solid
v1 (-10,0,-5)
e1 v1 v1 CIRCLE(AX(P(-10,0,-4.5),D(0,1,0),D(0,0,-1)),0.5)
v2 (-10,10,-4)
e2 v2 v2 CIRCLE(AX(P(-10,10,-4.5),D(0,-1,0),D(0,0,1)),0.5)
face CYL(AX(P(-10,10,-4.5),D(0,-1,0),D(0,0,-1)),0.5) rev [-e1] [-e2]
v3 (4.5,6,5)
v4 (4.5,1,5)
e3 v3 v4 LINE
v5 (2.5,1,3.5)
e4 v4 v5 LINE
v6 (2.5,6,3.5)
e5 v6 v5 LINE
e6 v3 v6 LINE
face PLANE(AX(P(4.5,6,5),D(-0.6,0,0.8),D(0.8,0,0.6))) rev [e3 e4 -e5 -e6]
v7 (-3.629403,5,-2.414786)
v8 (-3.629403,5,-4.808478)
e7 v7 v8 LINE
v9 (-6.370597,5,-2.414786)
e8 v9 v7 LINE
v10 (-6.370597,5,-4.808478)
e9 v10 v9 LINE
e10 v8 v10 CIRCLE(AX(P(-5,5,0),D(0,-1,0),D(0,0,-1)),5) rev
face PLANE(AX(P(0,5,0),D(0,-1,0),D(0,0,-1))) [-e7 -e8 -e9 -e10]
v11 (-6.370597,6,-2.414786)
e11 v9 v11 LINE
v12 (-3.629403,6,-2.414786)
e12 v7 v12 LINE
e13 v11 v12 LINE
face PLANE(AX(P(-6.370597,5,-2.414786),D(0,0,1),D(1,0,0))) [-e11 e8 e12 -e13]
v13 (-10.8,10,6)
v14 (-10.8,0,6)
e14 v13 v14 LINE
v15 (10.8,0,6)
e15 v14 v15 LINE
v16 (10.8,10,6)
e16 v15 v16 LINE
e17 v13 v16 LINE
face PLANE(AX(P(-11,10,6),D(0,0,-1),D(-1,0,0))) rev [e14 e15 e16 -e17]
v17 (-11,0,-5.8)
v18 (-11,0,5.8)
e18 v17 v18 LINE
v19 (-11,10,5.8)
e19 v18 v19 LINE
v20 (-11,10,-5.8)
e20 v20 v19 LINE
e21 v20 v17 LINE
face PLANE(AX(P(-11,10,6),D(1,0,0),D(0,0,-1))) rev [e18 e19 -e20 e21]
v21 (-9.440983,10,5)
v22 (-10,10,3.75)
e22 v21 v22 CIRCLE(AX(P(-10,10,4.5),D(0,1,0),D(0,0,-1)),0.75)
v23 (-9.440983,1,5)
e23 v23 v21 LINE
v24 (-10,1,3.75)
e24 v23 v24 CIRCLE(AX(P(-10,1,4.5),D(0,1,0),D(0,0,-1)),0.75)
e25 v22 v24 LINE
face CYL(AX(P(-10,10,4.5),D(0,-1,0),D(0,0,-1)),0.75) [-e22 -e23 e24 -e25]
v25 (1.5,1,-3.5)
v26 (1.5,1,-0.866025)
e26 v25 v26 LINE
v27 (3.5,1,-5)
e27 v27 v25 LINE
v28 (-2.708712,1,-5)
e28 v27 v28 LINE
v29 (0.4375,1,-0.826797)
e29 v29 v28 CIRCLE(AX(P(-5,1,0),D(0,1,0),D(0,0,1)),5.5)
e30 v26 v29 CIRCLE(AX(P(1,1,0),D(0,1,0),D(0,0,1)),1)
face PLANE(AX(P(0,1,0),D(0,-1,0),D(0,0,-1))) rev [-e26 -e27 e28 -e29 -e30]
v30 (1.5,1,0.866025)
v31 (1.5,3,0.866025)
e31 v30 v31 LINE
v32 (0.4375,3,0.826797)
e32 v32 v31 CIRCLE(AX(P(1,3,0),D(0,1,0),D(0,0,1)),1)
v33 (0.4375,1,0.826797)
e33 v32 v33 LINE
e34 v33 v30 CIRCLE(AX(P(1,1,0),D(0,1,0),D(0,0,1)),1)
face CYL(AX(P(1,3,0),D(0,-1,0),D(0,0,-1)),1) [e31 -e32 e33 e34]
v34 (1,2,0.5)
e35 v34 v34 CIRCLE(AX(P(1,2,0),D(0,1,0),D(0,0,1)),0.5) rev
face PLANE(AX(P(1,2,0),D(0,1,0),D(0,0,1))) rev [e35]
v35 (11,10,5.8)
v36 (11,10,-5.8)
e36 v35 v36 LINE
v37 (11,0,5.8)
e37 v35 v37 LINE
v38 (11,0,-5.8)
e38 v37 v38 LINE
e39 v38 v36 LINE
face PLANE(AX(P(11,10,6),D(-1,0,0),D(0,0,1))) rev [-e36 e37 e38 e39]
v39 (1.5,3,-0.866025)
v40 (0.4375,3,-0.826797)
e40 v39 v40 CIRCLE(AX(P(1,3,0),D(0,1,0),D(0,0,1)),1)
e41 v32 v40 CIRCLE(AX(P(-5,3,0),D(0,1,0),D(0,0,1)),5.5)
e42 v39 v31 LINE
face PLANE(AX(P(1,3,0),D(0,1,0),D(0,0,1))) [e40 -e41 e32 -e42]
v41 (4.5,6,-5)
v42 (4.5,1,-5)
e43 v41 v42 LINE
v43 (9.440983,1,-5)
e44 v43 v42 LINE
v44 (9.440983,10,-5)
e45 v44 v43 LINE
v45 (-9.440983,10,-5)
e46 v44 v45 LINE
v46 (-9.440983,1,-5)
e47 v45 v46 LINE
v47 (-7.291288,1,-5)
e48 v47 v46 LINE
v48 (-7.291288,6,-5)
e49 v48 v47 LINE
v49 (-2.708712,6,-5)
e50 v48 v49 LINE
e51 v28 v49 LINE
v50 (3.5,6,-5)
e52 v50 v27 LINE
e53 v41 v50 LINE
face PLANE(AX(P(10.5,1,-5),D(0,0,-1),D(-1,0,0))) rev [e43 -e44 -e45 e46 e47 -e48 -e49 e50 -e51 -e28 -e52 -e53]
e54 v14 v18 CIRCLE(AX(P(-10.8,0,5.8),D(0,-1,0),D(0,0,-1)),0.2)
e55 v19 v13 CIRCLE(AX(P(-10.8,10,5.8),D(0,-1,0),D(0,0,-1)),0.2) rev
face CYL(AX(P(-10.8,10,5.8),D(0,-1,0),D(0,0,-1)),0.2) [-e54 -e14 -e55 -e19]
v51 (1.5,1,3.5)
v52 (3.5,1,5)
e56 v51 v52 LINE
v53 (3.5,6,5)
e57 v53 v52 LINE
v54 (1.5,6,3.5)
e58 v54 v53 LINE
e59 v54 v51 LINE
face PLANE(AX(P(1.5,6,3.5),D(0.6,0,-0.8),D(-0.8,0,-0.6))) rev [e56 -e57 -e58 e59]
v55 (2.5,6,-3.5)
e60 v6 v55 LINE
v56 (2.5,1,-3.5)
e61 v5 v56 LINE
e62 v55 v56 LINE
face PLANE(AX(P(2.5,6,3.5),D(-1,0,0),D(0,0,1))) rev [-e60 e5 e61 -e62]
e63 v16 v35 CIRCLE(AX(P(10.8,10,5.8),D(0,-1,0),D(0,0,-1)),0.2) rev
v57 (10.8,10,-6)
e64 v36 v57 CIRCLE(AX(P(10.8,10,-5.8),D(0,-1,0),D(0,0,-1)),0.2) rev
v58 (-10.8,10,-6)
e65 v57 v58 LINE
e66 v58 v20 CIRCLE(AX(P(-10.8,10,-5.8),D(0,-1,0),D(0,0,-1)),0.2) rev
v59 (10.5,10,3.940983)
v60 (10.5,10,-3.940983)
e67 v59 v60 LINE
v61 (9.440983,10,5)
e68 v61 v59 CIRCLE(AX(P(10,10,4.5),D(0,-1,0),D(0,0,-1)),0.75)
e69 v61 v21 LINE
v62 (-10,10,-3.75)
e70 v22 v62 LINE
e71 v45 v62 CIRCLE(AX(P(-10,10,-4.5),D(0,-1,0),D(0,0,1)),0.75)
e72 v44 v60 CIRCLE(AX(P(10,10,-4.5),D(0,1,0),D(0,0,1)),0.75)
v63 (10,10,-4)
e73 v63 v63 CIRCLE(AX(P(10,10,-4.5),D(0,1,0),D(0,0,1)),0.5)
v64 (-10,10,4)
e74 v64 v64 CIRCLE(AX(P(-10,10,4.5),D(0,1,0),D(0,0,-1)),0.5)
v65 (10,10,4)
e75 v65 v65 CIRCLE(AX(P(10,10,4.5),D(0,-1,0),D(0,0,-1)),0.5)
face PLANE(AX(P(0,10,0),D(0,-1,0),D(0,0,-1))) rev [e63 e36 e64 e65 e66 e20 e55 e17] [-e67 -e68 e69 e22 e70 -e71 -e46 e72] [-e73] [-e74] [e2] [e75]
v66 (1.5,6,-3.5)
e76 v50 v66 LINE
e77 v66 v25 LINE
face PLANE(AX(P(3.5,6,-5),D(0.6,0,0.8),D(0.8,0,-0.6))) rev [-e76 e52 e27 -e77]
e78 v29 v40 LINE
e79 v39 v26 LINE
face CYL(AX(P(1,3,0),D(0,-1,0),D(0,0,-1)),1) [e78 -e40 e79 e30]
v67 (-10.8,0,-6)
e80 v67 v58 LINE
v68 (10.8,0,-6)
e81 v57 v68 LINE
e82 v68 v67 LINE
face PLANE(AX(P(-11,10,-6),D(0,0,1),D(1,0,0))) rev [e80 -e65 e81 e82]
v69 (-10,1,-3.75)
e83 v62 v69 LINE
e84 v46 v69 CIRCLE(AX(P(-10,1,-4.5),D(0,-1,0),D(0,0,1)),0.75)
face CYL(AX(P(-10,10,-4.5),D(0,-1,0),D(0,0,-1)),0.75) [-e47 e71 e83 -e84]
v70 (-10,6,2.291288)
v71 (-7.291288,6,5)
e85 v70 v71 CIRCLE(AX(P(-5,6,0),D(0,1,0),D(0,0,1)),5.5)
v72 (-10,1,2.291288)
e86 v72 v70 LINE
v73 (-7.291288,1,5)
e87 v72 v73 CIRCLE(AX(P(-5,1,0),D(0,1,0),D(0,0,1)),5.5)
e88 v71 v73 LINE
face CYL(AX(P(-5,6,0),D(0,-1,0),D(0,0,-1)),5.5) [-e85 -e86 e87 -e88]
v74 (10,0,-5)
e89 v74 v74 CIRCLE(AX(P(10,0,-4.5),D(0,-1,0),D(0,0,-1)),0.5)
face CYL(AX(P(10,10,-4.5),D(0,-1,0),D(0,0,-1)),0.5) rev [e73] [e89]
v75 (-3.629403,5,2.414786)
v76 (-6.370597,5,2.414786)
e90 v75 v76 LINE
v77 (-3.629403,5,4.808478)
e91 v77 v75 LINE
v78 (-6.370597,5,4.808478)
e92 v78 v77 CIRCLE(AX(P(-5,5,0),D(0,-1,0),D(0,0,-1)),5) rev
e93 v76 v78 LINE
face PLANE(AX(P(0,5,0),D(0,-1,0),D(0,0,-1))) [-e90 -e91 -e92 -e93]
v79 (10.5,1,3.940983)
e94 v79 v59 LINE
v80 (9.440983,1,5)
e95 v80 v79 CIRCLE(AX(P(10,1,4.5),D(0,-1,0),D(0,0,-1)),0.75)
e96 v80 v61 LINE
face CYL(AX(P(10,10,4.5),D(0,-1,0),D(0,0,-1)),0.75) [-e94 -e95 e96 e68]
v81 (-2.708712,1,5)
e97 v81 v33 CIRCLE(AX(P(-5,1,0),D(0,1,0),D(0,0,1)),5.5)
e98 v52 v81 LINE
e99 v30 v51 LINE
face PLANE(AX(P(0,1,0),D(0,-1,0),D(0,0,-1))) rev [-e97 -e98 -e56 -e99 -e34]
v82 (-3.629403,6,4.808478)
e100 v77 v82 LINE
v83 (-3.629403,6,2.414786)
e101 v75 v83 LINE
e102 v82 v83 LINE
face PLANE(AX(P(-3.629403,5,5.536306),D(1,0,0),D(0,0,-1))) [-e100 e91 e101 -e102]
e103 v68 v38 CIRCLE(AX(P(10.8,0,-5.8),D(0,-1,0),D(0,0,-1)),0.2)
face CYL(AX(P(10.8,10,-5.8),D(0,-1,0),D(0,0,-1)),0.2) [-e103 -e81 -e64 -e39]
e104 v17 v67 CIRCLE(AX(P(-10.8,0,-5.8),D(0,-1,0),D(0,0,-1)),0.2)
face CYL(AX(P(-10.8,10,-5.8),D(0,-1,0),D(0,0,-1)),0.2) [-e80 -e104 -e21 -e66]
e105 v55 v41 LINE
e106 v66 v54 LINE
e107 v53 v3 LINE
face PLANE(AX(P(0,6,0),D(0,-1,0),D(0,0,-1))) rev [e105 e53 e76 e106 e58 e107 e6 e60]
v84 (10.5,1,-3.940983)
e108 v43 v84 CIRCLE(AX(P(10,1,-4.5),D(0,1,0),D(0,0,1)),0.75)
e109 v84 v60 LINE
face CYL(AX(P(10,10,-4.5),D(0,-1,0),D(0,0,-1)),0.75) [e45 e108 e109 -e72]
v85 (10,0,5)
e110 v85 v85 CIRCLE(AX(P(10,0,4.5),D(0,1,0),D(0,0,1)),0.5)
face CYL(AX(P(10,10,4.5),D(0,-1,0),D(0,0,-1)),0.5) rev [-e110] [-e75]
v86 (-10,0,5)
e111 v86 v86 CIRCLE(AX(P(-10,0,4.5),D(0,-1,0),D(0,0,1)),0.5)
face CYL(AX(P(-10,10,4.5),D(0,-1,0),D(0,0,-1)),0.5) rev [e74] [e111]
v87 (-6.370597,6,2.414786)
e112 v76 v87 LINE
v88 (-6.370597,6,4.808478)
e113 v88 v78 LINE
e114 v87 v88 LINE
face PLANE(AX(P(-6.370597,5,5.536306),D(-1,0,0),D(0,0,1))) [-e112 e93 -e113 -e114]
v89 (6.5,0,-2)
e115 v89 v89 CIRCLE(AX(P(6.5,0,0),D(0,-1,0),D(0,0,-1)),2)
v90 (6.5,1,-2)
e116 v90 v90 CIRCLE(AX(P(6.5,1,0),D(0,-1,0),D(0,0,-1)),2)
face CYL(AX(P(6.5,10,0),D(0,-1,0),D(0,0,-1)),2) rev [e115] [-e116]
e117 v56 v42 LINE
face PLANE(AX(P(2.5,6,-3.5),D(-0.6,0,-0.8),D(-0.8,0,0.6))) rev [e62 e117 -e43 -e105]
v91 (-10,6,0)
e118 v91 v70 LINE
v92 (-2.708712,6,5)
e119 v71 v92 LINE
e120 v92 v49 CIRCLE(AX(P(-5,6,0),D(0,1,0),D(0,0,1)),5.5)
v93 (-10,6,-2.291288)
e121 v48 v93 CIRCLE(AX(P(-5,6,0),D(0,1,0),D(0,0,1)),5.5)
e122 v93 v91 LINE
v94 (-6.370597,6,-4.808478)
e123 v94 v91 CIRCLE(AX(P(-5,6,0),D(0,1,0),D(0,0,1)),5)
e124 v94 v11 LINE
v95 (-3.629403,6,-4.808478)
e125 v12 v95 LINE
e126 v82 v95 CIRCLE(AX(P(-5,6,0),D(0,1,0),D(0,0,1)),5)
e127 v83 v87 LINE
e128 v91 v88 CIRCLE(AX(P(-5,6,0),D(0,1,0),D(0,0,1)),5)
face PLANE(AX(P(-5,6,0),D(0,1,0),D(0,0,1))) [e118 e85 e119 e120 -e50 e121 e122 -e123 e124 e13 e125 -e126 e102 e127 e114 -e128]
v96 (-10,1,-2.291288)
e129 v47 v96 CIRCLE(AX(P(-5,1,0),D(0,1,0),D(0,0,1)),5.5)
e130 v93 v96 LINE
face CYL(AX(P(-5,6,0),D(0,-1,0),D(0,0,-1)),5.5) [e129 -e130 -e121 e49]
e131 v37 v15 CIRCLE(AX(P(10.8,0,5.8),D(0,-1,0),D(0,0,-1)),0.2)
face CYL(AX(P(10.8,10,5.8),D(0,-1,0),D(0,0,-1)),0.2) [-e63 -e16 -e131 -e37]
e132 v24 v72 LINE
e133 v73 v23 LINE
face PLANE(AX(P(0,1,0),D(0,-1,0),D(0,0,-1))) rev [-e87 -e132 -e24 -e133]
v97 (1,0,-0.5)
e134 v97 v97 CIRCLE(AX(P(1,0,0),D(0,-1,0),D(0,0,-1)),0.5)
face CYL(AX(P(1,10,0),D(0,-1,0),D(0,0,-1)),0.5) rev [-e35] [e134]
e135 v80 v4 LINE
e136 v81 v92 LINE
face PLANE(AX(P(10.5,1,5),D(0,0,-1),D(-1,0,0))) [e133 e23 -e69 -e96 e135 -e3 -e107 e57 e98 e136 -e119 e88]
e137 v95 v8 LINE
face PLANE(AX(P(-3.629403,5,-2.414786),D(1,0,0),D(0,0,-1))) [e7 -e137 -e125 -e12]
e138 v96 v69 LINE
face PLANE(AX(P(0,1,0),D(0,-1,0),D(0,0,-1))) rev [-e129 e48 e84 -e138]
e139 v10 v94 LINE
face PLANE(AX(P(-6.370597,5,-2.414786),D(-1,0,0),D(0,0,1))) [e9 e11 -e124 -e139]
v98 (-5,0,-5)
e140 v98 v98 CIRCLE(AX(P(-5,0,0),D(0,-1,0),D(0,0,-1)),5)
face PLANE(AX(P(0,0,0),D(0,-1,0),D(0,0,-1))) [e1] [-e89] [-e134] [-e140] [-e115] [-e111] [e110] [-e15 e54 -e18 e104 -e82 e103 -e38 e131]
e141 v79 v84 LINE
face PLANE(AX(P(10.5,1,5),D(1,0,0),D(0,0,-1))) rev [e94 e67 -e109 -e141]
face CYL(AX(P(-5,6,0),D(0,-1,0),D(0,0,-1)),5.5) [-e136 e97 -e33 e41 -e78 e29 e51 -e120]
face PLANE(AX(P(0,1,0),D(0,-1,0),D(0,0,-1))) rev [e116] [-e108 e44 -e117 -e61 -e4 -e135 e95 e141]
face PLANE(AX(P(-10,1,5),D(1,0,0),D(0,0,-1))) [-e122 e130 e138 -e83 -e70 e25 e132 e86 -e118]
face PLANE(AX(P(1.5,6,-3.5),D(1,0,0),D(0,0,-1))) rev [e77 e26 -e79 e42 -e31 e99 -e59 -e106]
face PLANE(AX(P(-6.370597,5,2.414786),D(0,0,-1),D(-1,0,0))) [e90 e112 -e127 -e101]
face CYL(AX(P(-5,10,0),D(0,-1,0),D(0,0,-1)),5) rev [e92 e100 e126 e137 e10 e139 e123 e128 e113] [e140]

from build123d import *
from build123d.topology import SkipClean

# Parameters (mm, degrees)
SKETCH1_W                 = 22
SKETCH1_H                 = 12
BOSS_EXTRUDE1_DEPTH       = 10
SKETCH2_W                 = 20.5
SKETCH2_H                 = 10
CUT_EXTRUDE1_DEPTH        = 9
FILLET1_R                 = 0.2
SKETCH3_R                 = 5
CUT_EXTRUDE2_DEPTH        = 17.031219542
SKETCH4_R                 = 0.5
CUT_EXTRUDE3_DEPTH        = 17.031219542
SKETCH5_R                 = 2
CUT_EXTRUDE4_DEPTH        = 17.031219542
BOSS_EXTRUDE2_DEPTH       = 5
SKETCH9_R                 = 5.5
SKETCH9_R_2               = 5
BOSS_EXTRUDE3_DEPTH       = 5
SKETCH10_R                = 1
SKETCH10_R_2              = 0.5
BOSS_EXTRUDE4_DEPTH       = 2
BOSS_EXTRUDE6_START       = -1
SKETCH12_R                = 0.5
BOSS_EXTRUDE6_DEPTH       = 1
SKETCH13_R                = 0.75
SKETCH13_R_2              = 0.5
BOSS_EXTRUDE7_DEPTH       = 9
SKETCH14_R                = 0.5
CUT_EXTRUDE5_DEPTH        = 17.031219542
MIRROR2_COPY_1_SKETCH_R   = 0.75
MIRROR2_COPY_1_SKETCH_R_2 = 0.5
MIRROR2_COPY_1_DEPTH      = 9
MIRROR2_COPY_2_SKETCH_R   = 0.5
MIRROR2_COPY_2_DEPTH      = 17.031219542
MIRROR2_COPY_3_SKETCH_R   = 0.75
MIRROR2_COPY_3_SKETCH_R_2 = 0.5
MIRROR2_COPY_3_DEPTH      = 9
MIRROR2_COPY_4_SKETCH_R   = 0.5
MIRROR2_COPY_4_DEPTH      = 17.031219542
SKETCH15_W                = 2.741193842
SKETCH15_H                = 3.121519946
BOSS_EXTRUDE8_DEPTH       = 1


with BuildPart() as part:
    # Sketch1 → Boss-Extrude1 (new body)
    with BuildSketch(Plane(origin=(0, 0, 0), x_dir=(1, 0, 0), z_dir=(0, 1, 0))):
        Rectangle(SKETCH1_W, SKETCH1_H)
    extrude(amount=BOSS_EXTRUDE1_DEPTH)

    # Sketch2 → Cut-Extrude1 (cut)
    with BuildSketch(Plane(origin=(0, 10, 0), x_dir=(1, 0, 0), z_dir=(0, 1, 0))):
        with Locations((0.25, 0)):
            Rectangle(SKETCH2_W, SKETCH2_H)
    extrude(amount=-CUT_EXTRUDE1_DEPTH, mode=Mode.SUBTRACT)

    # Fillet1
    fillet1_edges = [part.edges().sort_by_distance(p)[0] for p in [
        (-11, 5, -6),
        (11, 5, -6),
        (11, 5, 6),
        (-11, 5, 6),
    ]]
    fillet(fillet1_edges, radius=FILLET1_R)

    # Sketch3 → Cut-Extrude2 (cut, through all)
    with BuildSketch(Plane(origin=(0, 0, 0), x_dir=(-1, 0, 0), z_dir=(0, -1, 0))):
        with Locations((5, 0)):
            Circle(SKETCH3_R)
    extrude(amount=-CUT_EXTRUDE2_DEPTH, mode=Mode.SUBTRACT)

    # Sketch4 → Cut-Extrude3 (cut, through all)
    with BuildSketch(Plane(origin=(0, 0, 0), x_dir=(-1, 0, 0), z_dir=(0, -1, 0))):
        with Locations((-1, 0)):
            Circle(SKETCH4_R)
    extrude(amount=-CUT_EXTRUDE3_DEPTH, mode=Mode.SUBTRACT)

    # Sketch5 → Cut-Extrude4 (cut, through all)
    with BuildSketch(Plane(origin=(0, 0, 0), x_dir=(-1, 0, 0), z_dir=(0, -1, 0))):
        with Locations((-6.5, 0)):
            Circle(SKETCH5_R)
    extrude(amount=-CUT_EXTRUDE4_DEPTH, mode=Mode.SUBTRACT)

    # Sketch6 → Boss-Extrude2 (add)
    with BuildSketch(Plane(origin=(0, 1, 0), x_dir=(1, 0, 0), z_dir=(0, 1, 0))):
        Polygon((2.5, -3.5), (2.5, 3.5), (4.5, 5), (3.5, 5), (1.5, 3.5), (1.5, -3.5), (3.5, -5), (4.5, -5), align=None)
    extrude(amount=BOSS_EXTRUDE2_DEPTH)

    # Sketch9 → Boss-Extrude3 (add)
    with SkipClean():  # the faces are left unmerged after this step: merging them gives an invalid solid
        with BuildSketch(Plane(origin=(0, 1, 0), x_dir=(1, 0, 0), z_dir=(0, 1, 0))):
            with Locations((-5, 0)):
                Circle(SKETCH9_R)
            with Locations((-5, 0)):
                Circle(SKETCH9_R_2, mode=Mode.SUBTRACT)
        extrude(amount=BOSS_EXTRUDE3_DEPTH)

    # Sketch10 → Boss-Extrude4 (add)
    with SkipClean():  # the faces are left unmerged after this step: merging them gives an invalid solid
        with BuildSketch(Plane(origin=(0, 1, 0), x_dir=(1, 0, 0), z_dir=(0, 1, 0))):
            with Locations((1, 0)):
                Circle(SKETCH10_R)
            with Locations((1, 0)):
                Circle(SKETCH10_R_2, mode=Mode.SUBTRACT)
        extrude(amount=BOSS_EXTRUDE4_DEPTH)

    # Sketch12 → Boss-Extrude6 (add)
    with SkipClean():  # the faces are left unmerged after this step: merging them gives an invalid solid
        with BuildSketch(Plane(origin=(0, 3, 0), x_dir=(1, 0, 0), z_dir=(0, 1, 0)).offset(BOSS_EXTRUDE6_START)):
            with Locations((1, 0)):
                Circle(SKETCH12_R)
        extrude(amount=BOSS_EXTRUDE6_DEPTH)

    # Sketch13 → Boss-Extrude7 (add)
    with SkipClean():  # the faces are left unmerged after this step: merging them gives an invalid solid
        with BuildSketch(Plane(origin=(0, 1, 0), x_dir=(1, 0, 0), z_dir=(0, 1, 0))):
            with Locations((10, 4.5)):
                Circle(SKETCH13_R)
            with Locations((10, 4.5)):
                Circle(SKETCH13_R_2, mode=Mode.SUBTRACT)
        boss_extrude7 = extrude(amount=BOSS_EXTRUDE7_DEPTH)

    # Sketch14 → Cut-Extrude5 (cut, through all)
    with SkipClean():  # the faces are left unmerged after this step: merging them gives an invalid solid
        with BuildSketch(Plane(origin=(0, 0, 0), x_dir=(-1, 0, 0), z_dir=(0, -1, 0))):
            with Locations((-10, 4.5)):
                Circle(SKETCH14_R)
        cut_extrude5 = extrude(amount=-CUT_EXTRUDE5_DEPTH, mode=Mode.SUBTRACT)

    # Mirror1: Boss-Extrude7, Cut-Extrude5 across plane
    with SkipClean():  # the faces are left unmerged after this step: merging them gives an invalid solid
        add(boss_extrude7.mirror(Plane(origin=(0, 0, 0), x_dir=(0, 0, 1), z_dir=(1, 0, 0))))
        add(cut_extrude5.mirror(Plane(origin=(0, 0, 0), x_dir=(0, 0, 1), z_dir=(1, 0, 0))), mode=Mode.SUBTRACT)

    # Mirror2 copy 1 sketch → Mirror2 copy 1 (add)
    with SkipClean():  # the faces are left unmerged after this step: merging them gives an invalid solid
        with BuildSketch(Plane(origin=(0, 1, 0), x_dir=(-1, 0, 0), z_dir=(0, 1, 0))):
            with Locations((10, 4.5)):
                Circle(MIRROR2_COPY_1_SKETCH_R)
            with Locations((10, 4.5)):
                Circle(MIRROR2_COPY_1_SKETCH_R_2, mode=Mode.SUBTRACT)
        extrude(amount=MIRROR2_COPY_1_DEPTH)

    # Mirror2 copy 2 sketch → Mirror2 copy 2 (cut, through all)
    with SkipClean():  # the faces are left unmerged after this step: merging them gives an invalid solid
        with BuildSketch(Plane.XZ):
            with Locations((-10, 4.5)):
                Circle(MIRROR2_COPY_2_SKETCH_R)
        extrude(amount=-MIRROR2_COPY_2_DEPTH, mode=Mode.SUBTRACT)

    # Mirror2 copy 3 sketch → Mirror2 copy 3 (add)
    with SkipClean():  # the faces are left unmerged after this step: merging them gives an invalid solid
        with BuildSketch(Plane(origin=(0, 1, 0), x_dir=(1, 0, 0), z_dir=(0, 1, 0))):
            with Locations((10, -4.5)):
                Circle(MIRROR2_COPY_3_SKETCH_R)
            with Locations((10, -4.5)):
                Circle(MIRROR2_COPY_3_SKETCH_R_2, mode=Mode.SUBTRACT)
        extrude(amount=MIRROR2_COPY_3_DEPTH)

    # Mirror2 copy 4 sketch → Mirror2 copy 4 (cut, through all)
    with SkipClean():  # the faces are left unmerged after this step: merging them gives an invalid solid
        with BuildSketch(Plane(origin=(0, 0, 0), x_dir=(-1, 0, 0), z_dir=(0, -1, 0))):
            with Locations((-10, -4.5)):
                Circle(MIRROR2_COPY_4_SKETCH_R)
        extrude(amount=-MIRROR2_COPY_4_DEPTH, mode=Mode.SUBTRACT)

    # Sketch15 → Boss-Extrude8 (add)
    with SkipClean():  # the faces are left unmerged after this step: merging them gives an invalid solid
        with BuildSketch(Plane(origin=(0, 6, 0), x_dir=(1, 0, 0), z_dir=(0, 1, 0))):
            with Locations((-5, 3.975545746)):
                Rectangle(SKETCH15_W, SKETCH15_H)
            with Locations((-5, -3.975545746)):
                Rectangle(SKETCH15_W, SKETCH15_H)
        extrude(amount=-BOSS_EXTRUDE8_DEPTH)


solid = part.part
